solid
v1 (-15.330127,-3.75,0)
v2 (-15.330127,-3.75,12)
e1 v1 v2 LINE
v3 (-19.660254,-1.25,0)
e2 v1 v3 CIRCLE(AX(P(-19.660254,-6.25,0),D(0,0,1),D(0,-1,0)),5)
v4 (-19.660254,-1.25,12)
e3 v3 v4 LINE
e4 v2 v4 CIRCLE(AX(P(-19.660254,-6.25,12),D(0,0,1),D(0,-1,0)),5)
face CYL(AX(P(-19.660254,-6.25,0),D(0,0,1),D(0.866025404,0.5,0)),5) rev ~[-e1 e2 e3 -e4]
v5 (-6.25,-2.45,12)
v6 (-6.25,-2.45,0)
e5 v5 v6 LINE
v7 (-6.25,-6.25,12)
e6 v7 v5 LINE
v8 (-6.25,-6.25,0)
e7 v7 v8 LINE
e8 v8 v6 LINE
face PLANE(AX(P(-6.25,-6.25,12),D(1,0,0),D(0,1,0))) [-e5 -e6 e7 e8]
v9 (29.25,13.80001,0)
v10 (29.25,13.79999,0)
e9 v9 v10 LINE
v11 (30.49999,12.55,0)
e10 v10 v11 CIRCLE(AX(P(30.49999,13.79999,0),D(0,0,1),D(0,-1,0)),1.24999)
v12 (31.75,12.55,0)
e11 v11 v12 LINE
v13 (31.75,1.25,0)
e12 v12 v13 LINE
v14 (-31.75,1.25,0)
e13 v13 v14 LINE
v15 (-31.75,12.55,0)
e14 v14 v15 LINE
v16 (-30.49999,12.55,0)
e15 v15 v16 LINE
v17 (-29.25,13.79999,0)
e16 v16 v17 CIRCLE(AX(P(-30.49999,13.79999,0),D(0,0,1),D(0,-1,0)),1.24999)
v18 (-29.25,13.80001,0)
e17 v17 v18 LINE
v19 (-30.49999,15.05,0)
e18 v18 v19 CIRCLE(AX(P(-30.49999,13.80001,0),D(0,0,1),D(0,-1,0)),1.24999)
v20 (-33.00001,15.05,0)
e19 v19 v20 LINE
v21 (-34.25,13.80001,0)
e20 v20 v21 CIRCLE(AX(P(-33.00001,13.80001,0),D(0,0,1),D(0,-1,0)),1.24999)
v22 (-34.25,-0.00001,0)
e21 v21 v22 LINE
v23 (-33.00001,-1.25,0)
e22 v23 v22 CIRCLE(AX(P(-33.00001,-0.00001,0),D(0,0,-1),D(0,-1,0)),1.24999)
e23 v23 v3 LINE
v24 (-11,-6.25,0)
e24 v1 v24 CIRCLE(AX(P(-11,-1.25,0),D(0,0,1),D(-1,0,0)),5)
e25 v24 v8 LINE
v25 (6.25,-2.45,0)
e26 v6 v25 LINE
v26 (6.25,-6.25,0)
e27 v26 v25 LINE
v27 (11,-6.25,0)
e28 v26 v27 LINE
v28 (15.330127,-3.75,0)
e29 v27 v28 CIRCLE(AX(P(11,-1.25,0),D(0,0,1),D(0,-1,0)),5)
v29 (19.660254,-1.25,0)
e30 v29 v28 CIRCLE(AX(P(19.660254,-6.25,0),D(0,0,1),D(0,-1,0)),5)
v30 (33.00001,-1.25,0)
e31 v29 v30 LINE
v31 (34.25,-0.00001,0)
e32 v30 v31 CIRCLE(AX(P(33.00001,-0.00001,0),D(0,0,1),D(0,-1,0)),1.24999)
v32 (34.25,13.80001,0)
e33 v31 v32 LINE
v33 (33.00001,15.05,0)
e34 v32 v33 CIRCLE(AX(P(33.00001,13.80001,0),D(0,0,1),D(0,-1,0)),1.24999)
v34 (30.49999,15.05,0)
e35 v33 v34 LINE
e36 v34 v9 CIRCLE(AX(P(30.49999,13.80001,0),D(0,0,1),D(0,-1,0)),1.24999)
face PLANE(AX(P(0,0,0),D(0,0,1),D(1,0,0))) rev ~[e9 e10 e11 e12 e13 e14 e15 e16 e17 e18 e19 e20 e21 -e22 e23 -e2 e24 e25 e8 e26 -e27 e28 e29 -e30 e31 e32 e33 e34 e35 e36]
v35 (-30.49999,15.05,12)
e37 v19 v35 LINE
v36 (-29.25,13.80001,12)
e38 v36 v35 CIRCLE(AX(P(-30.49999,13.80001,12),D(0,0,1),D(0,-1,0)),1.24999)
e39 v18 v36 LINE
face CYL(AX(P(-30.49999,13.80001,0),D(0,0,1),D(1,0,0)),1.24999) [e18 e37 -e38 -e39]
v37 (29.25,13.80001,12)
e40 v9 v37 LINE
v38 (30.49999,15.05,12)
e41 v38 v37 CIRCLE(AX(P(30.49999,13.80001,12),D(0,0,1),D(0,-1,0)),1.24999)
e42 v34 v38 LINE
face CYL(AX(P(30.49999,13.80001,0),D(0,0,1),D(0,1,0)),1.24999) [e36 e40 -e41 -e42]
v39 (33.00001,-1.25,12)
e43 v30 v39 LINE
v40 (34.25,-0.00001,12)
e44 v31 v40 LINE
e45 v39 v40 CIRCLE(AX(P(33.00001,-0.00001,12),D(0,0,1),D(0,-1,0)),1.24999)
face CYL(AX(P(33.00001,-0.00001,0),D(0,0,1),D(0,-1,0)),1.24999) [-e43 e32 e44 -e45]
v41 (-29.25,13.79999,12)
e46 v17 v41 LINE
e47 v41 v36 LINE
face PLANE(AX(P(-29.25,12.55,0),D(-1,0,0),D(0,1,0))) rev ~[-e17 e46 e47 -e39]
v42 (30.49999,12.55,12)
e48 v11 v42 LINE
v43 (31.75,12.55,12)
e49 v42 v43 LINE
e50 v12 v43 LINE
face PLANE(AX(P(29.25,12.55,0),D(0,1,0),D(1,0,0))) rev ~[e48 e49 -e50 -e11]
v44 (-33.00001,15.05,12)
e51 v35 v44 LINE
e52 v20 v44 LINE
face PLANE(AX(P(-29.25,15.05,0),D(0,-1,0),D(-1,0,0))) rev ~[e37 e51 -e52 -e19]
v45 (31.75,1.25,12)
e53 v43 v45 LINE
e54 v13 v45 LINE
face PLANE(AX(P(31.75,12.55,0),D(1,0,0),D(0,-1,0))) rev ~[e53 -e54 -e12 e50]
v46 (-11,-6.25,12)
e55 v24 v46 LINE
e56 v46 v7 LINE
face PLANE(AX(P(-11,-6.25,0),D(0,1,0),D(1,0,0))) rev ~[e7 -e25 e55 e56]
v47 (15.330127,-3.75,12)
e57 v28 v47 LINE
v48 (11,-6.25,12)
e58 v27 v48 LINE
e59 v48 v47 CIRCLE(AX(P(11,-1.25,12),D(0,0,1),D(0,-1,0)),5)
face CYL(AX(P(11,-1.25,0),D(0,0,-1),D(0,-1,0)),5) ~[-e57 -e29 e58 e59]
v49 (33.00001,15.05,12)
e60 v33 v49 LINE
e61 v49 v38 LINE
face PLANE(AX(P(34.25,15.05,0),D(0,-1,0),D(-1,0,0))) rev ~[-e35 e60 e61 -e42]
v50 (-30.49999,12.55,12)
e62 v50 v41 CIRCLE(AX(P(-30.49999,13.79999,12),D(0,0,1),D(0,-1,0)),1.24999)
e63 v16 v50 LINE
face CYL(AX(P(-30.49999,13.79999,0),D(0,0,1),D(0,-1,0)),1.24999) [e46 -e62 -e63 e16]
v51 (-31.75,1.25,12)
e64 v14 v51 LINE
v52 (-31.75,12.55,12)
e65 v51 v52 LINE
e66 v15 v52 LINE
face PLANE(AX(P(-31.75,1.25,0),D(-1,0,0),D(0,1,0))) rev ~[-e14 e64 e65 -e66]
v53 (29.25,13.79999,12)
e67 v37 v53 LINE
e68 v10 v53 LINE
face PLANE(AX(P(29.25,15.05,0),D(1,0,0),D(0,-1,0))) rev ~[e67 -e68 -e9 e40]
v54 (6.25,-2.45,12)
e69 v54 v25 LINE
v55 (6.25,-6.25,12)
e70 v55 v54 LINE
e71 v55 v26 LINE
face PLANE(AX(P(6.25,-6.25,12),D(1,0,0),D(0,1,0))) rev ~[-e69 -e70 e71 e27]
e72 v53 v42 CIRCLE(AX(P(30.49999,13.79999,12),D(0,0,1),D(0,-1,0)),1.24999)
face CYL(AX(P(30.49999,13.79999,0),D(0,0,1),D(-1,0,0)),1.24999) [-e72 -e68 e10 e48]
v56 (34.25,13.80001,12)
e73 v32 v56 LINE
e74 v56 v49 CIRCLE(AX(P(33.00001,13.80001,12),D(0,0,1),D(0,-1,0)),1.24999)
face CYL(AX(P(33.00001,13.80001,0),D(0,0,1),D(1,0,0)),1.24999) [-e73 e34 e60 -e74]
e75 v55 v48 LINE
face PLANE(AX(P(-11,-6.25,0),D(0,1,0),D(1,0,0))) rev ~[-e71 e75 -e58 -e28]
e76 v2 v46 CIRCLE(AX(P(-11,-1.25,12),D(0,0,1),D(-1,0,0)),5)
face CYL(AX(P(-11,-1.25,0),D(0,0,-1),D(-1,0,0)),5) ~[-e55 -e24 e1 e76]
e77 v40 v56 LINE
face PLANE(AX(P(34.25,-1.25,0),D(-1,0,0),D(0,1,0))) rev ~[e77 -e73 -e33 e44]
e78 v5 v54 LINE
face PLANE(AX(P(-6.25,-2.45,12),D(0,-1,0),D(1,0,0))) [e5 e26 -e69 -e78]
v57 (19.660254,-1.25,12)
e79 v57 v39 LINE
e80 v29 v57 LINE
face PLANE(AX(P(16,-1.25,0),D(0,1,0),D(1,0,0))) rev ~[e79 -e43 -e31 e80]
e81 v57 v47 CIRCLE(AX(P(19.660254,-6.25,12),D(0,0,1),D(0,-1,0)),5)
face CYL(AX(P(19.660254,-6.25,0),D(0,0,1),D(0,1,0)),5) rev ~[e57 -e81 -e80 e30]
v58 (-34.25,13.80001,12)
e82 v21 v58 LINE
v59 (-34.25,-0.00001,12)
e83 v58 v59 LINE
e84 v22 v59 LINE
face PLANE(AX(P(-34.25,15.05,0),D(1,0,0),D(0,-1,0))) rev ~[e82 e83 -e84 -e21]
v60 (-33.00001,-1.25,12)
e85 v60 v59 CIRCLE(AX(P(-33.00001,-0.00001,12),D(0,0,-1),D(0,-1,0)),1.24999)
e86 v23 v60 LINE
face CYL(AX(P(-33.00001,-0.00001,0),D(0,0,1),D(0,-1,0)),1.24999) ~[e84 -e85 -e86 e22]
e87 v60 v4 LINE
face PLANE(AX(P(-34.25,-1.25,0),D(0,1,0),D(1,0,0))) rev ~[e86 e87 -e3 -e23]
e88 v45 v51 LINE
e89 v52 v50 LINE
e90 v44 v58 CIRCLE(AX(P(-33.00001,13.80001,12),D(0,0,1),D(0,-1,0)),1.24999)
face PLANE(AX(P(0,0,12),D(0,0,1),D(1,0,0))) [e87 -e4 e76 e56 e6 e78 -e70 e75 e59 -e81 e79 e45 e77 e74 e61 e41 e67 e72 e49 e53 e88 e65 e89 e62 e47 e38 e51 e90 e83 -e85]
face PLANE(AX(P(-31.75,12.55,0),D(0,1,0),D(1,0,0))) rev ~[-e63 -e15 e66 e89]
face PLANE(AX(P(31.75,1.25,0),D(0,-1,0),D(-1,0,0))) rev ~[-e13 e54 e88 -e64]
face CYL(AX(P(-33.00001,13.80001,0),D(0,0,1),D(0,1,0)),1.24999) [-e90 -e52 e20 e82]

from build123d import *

# Parameters (mm, degrees)
F0_W     = 22
F0_H     = 5
F1_DEPTH = 12
F2_W     = 12.5
F2_H     = 3.8
F3_DEPTH = 12
F4_R     = 5
F5_R     = 1.24999


# Not quite as in the source:
# - a fillet or chamfer is up to 0.001 mm smaller than in the source, because OpenCascade refuses the exact size


with BuildPart() as f1:
    # F0 (on Top) → F1 (new body)
    with BuildSketch(Plane.XY):
        Polygon((31.75, -1.25), (31.75, 1.25), (-31.75, 1.25), (-31.75, -1.25), (-16, -1.25), (-11, -1.25), (11, -1.25), (16, -1.25), align=None)
        Polygon((31.75, 12.55), (31.75, 1.25), (31.75, -1.25), (34.25, -1.25), (34.25, 12.55), align=None)
        Polygon((-31.75, -1.25), (-31.75, 1.25), (-31.75, 12.55), (-34.25, 12.55), (-34.25, -1.25), align=None)
        Polygon((29.25, 12.55), (31.75, 12.55), (34.25, 12.55), (34.25, 15.05), (29.25, 15.05), align=None)
        Polygon((-34.25, 12.55), (-31.75, 12.55), (-29.25, 12.55), (-29.25, 15.05), (-34.25, 15.05), align=None)
        with BuildLine():
            ThreePointArc((11, -6.25), (14.5355339059, -4.7855339059), (16, -1.25))
            Line((16, -1.25), (11, -1.25))
            Line((11, -1.25), (11, -6.25))
        make_face()
        with BuildLine():
            Line((-11, -1.25), (-16, -1.25))
            ThreePointArc((-16, -1.25), (-14.5355339059, -4.7855339059), (-11, -6.25))
            Line((-11, -6.25), (-11, -1.25))
        make_face()
        with Locations((0, -3.75)):
            Rectangle(F0_W, F0_H)
    extrude(amount=F1_DEPTH)

    # F2 (on face) → F3 (cut, through all)
    with BuildSketch(Plane.XY.offset(12)):
        with Locations((0, -4.35)):
            Rectangle(F2_W, F2_H)
    extrude(amount=-F3_DEPTH, mode=Mode.SUBTRACT)

    # F4
    f4_edges = [f1.edges().sort_by_distance(p)[0] for p in [
        (16, -1.25, 6),
        (-16, -1.25, 6),
    ]]
    fillet(f4_edges, radius=F4_R)

    # F5 (radius 1.25 in the source; OpenCascade refuses exactly that, so slightly less here)
    f5_edges = [f1.edges().sort_by_distance(p)[0] for p in [
        (-34.25, -1.25, 6),
        (34.25, -1.25, 6),
        (-34.25, 15.05, 6),
        (-29.25, 15.05, 6),
        (-29.25, 12.55, 6),
        (29.25, 12.55, 6),
        (29.25, 15.05, 6),
        (34.25, 15.05, 6),
    ]]
    fillet(f5_edges, radius=F5_R)


solid = f1.part
